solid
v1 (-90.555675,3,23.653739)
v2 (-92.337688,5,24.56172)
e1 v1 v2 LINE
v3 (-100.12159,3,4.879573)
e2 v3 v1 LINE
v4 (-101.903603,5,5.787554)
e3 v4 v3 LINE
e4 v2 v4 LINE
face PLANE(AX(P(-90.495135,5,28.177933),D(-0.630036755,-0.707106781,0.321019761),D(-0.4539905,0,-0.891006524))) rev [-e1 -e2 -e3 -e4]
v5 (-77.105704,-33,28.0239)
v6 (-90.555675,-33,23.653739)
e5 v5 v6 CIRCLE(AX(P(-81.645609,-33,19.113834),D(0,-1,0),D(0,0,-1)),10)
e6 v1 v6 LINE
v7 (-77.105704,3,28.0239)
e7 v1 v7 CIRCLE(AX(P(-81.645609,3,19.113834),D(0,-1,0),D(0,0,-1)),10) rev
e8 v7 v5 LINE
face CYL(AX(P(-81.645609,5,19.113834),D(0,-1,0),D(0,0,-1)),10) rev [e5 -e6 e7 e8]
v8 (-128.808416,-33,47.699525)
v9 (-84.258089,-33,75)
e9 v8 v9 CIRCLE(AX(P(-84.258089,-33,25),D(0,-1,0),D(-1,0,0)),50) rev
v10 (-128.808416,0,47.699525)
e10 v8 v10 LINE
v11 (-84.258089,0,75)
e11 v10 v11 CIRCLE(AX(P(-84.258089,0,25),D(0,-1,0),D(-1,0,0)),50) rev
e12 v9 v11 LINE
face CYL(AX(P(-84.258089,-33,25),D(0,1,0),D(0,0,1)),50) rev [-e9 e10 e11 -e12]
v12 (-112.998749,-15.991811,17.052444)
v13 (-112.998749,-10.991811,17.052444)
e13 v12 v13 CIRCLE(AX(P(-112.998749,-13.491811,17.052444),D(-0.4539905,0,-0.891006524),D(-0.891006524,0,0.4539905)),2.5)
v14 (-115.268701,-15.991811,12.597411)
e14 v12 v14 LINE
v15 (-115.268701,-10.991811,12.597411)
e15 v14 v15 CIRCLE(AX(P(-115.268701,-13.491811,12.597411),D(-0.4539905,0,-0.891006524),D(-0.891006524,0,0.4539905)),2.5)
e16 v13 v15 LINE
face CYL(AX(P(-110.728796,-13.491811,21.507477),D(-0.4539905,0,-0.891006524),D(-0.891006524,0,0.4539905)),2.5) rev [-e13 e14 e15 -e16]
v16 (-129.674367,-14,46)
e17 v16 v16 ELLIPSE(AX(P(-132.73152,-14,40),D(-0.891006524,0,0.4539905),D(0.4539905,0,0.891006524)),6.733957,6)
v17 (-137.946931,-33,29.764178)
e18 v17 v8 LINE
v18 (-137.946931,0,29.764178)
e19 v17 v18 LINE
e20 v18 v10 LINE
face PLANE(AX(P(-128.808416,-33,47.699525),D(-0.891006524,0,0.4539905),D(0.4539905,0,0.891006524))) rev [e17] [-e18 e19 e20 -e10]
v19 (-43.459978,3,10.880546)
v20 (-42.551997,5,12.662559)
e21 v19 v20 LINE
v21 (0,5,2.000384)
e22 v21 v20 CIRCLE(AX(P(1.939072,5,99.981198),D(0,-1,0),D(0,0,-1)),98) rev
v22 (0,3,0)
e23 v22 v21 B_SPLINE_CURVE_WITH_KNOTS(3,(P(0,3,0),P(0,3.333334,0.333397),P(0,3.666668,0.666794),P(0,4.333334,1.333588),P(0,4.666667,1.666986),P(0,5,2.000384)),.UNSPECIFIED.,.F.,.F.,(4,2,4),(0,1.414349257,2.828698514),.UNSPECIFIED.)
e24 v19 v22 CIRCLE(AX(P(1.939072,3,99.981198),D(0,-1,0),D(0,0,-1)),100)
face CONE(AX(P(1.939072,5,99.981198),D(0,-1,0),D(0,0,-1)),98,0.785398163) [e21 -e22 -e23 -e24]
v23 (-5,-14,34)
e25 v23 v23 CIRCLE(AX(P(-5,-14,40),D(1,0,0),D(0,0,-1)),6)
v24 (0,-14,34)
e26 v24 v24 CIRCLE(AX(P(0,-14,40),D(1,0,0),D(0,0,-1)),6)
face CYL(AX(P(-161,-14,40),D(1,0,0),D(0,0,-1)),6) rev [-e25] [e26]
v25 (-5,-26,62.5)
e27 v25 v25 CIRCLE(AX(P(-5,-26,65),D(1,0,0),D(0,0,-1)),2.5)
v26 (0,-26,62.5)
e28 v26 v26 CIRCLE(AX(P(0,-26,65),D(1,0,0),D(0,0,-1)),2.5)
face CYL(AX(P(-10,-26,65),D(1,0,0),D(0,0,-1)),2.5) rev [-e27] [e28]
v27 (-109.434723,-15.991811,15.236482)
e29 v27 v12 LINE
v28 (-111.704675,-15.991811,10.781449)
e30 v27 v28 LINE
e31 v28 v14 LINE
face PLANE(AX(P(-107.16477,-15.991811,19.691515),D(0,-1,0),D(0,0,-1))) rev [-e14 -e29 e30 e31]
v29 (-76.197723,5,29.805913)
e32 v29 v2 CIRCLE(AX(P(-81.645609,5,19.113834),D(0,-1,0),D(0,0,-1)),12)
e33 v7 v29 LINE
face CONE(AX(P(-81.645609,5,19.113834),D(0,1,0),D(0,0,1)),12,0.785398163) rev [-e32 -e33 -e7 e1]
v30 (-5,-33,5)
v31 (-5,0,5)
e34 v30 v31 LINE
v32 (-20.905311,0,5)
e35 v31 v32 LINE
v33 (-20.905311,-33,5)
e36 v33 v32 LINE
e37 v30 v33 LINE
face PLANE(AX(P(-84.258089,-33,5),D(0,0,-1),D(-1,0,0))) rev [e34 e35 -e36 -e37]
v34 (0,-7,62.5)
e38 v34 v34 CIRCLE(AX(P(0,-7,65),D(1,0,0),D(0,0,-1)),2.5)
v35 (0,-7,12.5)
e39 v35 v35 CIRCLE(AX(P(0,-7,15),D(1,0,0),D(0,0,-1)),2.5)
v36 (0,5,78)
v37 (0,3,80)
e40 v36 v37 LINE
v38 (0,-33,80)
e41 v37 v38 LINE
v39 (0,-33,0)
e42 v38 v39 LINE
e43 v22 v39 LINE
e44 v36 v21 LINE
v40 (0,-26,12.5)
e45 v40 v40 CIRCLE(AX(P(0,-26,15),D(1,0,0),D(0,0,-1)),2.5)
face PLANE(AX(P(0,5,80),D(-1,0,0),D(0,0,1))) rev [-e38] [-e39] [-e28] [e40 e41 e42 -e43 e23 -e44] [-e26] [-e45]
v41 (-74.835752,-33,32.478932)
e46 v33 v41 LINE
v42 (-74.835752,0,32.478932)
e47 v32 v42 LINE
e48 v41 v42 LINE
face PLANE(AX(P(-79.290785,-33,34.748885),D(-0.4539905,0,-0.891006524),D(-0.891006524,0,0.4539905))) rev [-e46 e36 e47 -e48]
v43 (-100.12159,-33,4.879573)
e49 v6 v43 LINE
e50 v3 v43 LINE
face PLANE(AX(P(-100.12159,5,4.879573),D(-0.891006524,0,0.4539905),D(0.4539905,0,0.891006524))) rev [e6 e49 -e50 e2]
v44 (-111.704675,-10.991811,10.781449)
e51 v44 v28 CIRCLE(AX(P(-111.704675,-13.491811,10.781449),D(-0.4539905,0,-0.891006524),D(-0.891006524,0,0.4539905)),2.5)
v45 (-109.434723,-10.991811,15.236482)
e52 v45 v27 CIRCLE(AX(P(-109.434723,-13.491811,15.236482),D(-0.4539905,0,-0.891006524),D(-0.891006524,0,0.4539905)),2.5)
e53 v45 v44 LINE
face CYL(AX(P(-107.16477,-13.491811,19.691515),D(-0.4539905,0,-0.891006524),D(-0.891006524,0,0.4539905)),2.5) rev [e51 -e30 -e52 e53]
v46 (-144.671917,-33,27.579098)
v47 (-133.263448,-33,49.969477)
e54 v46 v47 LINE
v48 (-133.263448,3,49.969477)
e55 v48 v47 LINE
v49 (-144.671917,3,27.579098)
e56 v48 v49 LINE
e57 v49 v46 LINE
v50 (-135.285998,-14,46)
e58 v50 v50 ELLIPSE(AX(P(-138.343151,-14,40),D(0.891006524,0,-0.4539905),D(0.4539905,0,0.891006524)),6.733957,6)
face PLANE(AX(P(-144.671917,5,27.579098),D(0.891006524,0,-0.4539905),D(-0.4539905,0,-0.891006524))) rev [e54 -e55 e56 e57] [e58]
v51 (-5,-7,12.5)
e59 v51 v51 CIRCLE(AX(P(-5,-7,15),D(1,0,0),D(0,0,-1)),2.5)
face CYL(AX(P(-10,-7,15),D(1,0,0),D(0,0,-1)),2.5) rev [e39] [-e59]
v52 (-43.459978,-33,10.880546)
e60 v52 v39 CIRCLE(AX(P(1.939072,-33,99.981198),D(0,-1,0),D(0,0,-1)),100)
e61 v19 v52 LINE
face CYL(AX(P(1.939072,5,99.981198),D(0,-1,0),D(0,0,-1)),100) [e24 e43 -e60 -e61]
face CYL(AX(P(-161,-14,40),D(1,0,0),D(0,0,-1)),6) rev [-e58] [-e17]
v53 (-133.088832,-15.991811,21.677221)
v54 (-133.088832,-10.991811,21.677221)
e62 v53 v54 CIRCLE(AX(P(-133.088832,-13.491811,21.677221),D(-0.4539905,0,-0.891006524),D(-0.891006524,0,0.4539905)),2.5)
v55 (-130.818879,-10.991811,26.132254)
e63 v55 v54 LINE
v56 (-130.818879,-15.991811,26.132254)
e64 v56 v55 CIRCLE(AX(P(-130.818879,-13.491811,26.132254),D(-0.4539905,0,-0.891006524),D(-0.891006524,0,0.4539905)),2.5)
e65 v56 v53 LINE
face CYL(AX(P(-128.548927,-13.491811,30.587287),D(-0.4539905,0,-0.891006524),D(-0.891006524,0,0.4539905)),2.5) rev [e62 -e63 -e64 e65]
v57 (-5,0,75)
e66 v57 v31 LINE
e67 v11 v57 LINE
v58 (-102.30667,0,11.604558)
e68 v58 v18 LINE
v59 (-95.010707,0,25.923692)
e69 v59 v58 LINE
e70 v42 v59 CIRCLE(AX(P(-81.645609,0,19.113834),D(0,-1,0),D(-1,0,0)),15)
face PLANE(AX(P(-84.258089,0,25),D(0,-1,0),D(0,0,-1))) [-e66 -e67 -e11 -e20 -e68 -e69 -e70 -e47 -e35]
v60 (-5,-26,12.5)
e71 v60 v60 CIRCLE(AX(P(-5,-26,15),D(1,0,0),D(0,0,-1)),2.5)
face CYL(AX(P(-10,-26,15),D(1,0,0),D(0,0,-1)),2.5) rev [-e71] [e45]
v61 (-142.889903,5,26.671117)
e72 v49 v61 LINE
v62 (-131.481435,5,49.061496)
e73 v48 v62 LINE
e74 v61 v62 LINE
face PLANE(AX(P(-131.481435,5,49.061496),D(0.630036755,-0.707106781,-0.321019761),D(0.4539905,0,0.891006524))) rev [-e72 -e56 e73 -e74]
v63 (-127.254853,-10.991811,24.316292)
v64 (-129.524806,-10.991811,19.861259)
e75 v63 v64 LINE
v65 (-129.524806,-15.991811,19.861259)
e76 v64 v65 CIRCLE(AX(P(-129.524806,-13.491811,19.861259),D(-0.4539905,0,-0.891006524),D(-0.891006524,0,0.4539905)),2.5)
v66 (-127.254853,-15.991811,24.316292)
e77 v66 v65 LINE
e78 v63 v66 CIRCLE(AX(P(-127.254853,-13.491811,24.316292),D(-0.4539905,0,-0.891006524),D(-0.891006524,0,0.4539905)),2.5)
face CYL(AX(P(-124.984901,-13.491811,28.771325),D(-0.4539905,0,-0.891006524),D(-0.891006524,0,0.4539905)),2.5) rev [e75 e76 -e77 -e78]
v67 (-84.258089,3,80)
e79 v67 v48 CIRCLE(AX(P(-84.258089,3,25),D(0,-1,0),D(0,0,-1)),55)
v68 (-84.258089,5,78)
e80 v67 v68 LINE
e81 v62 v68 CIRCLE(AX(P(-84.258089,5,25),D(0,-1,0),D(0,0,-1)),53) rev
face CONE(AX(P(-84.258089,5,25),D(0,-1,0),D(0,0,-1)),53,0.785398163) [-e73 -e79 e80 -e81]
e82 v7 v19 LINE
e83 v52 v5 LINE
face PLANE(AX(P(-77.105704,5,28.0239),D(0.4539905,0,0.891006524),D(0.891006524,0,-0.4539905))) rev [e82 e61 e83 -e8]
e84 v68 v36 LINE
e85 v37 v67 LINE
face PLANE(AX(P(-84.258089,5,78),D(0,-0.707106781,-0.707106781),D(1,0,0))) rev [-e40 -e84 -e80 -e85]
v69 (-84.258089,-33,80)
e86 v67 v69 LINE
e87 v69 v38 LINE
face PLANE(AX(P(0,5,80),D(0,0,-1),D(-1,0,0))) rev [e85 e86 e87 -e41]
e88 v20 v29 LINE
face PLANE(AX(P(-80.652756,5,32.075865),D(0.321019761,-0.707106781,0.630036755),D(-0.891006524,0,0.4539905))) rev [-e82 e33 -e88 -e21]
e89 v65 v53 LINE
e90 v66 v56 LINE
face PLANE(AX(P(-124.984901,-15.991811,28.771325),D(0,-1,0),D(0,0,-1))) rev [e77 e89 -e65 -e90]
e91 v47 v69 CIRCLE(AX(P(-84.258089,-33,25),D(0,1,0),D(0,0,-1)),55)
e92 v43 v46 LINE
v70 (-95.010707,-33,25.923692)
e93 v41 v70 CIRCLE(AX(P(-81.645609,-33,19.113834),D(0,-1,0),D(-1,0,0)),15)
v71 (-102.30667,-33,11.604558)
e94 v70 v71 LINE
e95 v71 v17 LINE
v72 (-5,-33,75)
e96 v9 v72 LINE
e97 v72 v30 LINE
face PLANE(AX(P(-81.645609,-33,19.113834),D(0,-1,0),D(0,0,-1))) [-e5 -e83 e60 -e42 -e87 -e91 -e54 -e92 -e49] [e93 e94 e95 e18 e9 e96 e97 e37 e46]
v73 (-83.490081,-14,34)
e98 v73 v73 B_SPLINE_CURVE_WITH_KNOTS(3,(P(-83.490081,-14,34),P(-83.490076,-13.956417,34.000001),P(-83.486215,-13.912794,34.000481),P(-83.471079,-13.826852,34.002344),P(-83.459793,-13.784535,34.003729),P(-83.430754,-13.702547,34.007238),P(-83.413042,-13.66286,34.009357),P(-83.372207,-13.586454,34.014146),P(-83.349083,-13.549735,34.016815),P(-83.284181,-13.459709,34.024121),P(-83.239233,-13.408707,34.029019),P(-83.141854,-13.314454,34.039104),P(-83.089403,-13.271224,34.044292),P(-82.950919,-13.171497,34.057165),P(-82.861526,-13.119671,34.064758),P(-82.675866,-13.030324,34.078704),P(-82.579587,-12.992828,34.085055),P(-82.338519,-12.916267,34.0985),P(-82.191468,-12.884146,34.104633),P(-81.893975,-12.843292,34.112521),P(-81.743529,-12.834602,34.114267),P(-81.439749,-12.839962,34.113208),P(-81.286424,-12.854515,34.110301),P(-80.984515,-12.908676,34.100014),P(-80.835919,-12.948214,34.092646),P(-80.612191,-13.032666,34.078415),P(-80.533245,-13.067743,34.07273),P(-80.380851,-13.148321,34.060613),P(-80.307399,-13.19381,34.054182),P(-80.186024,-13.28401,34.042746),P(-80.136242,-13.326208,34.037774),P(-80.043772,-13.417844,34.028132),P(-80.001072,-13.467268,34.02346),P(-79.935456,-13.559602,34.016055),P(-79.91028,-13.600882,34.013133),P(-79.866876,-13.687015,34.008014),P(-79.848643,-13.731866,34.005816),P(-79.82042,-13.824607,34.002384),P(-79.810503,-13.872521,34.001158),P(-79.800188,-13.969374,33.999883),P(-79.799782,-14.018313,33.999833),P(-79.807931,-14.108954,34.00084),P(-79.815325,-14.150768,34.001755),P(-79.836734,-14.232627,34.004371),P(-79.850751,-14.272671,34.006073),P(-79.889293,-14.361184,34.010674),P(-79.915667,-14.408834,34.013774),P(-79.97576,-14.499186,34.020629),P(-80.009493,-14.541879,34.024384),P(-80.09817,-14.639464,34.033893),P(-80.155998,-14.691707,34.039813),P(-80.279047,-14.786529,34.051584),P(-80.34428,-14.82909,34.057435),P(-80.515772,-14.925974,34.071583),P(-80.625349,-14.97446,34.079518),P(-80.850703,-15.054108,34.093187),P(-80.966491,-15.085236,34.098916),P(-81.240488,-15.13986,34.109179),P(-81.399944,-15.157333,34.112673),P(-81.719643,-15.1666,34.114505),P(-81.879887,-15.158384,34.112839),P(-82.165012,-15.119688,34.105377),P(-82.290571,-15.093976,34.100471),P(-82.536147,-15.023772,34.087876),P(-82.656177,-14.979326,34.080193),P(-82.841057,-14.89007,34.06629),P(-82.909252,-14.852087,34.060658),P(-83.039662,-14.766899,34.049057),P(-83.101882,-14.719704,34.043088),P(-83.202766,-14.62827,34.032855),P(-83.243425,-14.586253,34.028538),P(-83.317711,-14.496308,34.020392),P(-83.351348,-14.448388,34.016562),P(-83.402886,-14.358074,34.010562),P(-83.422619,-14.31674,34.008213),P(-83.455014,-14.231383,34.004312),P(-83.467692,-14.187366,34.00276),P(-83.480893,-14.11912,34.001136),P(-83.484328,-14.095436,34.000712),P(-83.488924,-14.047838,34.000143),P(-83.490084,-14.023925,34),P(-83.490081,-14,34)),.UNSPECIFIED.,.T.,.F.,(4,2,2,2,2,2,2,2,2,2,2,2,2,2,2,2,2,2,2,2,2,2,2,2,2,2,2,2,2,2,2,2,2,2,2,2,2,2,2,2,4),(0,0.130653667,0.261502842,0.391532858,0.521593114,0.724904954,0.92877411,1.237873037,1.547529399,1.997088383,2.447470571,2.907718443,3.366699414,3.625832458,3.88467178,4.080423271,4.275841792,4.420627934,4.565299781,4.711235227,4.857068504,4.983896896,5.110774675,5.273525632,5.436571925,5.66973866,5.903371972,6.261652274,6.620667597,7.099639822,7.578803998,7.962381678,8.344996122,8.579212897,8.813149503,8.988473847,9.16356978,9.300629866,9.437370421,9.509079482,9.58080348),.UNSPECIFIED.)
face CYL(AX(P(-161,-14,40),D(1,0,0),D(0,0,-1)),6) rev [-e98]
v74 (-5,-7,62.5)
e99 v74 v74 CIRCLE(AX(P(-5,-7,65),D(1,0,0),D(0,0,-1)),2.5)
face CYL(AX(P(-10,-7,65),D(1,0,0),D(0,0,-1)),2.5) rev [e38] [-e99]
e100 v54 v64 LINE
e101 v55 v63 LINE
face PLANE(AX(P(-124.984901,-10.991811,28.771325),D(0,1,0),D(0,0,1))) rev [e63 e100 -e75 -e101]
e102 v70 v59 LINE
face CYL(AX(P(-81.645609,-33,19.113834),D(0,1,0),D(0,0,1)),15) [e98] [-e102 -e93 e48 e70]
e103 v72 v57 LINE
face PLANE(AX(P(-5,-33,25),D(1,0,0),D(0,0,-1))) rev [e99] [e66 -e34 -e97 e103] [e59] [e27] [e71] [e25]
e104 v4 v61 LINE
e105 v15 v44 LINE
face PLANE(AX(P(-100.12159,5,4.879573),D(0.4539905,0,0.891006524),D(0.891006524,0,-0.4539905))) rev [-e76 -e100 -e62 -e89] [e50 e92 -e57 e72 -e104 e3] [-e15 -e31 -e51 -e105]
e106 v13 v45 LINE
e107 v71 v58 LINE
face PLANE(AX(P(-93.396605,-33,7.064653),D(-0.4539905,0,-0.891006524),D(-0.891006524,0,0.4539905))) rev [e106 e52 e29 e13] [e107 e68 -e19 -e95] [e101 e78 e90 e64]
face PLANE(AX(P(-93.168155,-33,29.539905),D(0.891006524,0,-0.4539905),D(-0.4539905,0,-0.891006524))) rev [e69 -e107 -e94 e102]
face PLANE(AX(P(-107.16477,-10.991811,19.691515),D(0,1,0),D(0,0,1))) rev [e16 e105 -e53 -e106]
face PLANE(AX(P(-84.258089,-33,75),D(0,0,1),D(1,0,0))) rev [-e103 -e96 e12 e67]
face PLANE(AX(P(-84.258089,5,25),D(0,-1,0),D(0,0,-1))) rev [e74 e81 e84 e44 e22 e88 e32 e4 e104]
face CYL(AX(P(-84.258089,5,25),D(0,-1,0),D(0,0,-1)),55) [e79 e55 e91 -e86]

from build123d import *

# Parameters (mm, degrees)
ESTRUSIONE_ESTRUSIONE1_DEPTH = 5
ESTRUSIONE_SOTTILE1_START    = -33
ESTRUSIONE_SOTTILE1_DEPTH    = 33
RACCORDO1_R                  = 100
SMUSSO1_SIZE                 = 2
TAGLIO_ESTRUSIONE1_DEPTH     = 10
SCHIZZO3_R                   = 2.5
TAGLIO_ESTRUSIONE2_DEPTH     = 10
SCHIZZO3_4_R                 = 6
TAGLIO_ESTRUSIONE3_DEPTH     = 161


with BuildPart() as part:
    # Schizzo1 → Estrusione-Estrusione1 (new body)
    with BuildSketch(Plane(origin=(0, 0, 0), x_dir=(1, 0, 0), z_dir=(0, 1, 0))):
        with BuildLine():
            Line((0, -80), (0, 0))
            Line((0, 0), (-22.105704403, 0))
            Line((-22.105704403, 0), (-77.105704403, -28.023899722))
            ThreePointArc((-77.105704403, -28.023899722), (-84.735779344, -28.624399643), (-90.555674642, -23.653739478))
            Line((-90.555674642, -23.653739478), (-100.121590311, -4.879572892))
            Line((-100.121590311, -4.879572892), (-144.67191652, -27.579097879))
            Line((-144.67191652, -27.579097879), (-133.263448287, -49.969477486))
            ThreePointArc((-133.263448287, -49.969477486), (-112.995510516, -71.895209039), (-84.258089456, -80))
            Line((-84.258089456, -80), (0, -80))
        make_face()
    extrude(amount=ESTRUSIONE_ESTRUSIONE1_DEPTH)

    # Schizzo1<3> → Estrusione-Sottile1 (add)
    with BuildSketch(Plane(origin=(0, 0, 0), x_dir=(1, 0, 0), z_dir=(0, 1, 0)).offset(ESTRUSIONE_SOTTILE1_START)):
        with BuildLine():
            Line((-90.555674642, -23.653739478), (-100.121590311, -4.879572892))
            Line((-100.121590311, -4.879572892), (-144.67191652, -27.579097879))
            Line((-144.67191652, -27.579097879), (-133.263448287, -49.969477486))
            ThreePointArc((-133.263448287, -49.969477486), (-112.995510516, -71.895209039), (-84.258089456, -80))
            Line((-84.258089456, -80), (0, -80))
            Line((0, -80), (0, 0))
            Line((0, 0), (-22.105704403, 0))
            Line((-22.105704403, 0), (-77.105704403, -28.023899722))
            ThreePointArc((-77.105704403, -28.023899722), (-84.735779344, -28.624399643), (-90.555674642, -23.653739478))
        make_face()
        with BuildLine():
            Line((-95.010707263, -25.923691976), (-102.306670433, -11.604558011))
            Line((-102.306670433, -11.604558011), (-137.946931401, -29.764178001))
            Line((-137.946931401, -29.764178001), (-128.808415666, -47.699524987))
            ThreePointArc((-128.808415666, -47.699524987), (-110.383017692, -67.632008218), (-84.258089456, -75))
            Line((-84.258089456, -75), (-5, -75))
            Line((-5, -75), (-5, -5))
            Line((-5, -5), (-20.905310607, -5))
            Line((-20.905310607, -5), (-74.835751904, -32.478932343))
            ThreePointArc((-74.835751904, -32.478932343), (-86.280864316, -33.379682225), (-95.010707263, -25.923691976))
        make_face(mode=Mode.SUBTRACT)
    extrude(amount=ESTRUSIONE_SOTTILE1_DEPTH)

    # Raccordo1
    # the kernel refuses this fillet: 100 mm, written as the material it takes off along each edge
    with BuildSketch(Plane(origin=(-22.105704403, -92.916153629, 0), x_dir=(-0.8910065241883712, 0, 0.4539904997395403), z_dir=(0, 1, 0))) as raccordo1_piece_1:
        with BuildLine():
            CenterArc((23.966461452, 100), RACCORDO1_R, 244.111076085, 25.888923915)
            Line((-19.696326845, 10.035779789), (-20.569582611, 8.236495385))
            ThreePointArc((-20.569582611, 8.236495385), (-10.756144422, 3.235876846), (-0.907980999, -1.782013048))
            Line((-0.907980999, -1.782013048), (0, -2))
            Line((0, -2), (23.966461452, -2))
            Line((23.966461452, -2), (23.966461452, 0))
        make_face()
    extrude(amount=157.832307258, mode=Mode.SUBTRACT)

    # Smusso1
    smusso1_edges = [part.edges().sort_by_distance(p)[0] for p in [
        (-84.735779344, 5, 28.624399643),
        (-95.338632476, 5, 14.266656185),
        (-138.967682403, 5, 38.774287682),
        (-112.995510516, 5, 71.895209039),
        (-42.129044728, 5, 80),
        (-60.28284116, 5, 19.452222767),
        (-22.347158994, 5, 2.975121197),
    ]]
    chamfer(smusso1_edges, length=SMUSSO1_SIZE)

    # Schizzo2 → Taglio-Estrusione1 (cut)
    with BuildSketch(Plane(origin=(-18.661969348, 0, -36.626177095), x_dir=(-0.8910065241883686, 0, 0.4539904997395456), z_dir=(-0.4539904997395456, 0, -0.8910065241883686))):
        with BuildLine():
            Line((104.424269915, -10.991811), (108.424269915, -10.991811))
            ThreePointArc((108.424269915, -10.991811), (110.924269915, -13.491811), (108.424269915, -15.991811))
            Line((108.424269915, -15.991811), (104.424269915, -15.991811))
            ThreePointArc((104.424269915, -15.991811), (101.924269915, -13.491811), (104.424269915, -10.991811))
        make_face()
        with BuildLine():
            Line((124.424269915, -10.991811), (128.424269915, -10.991811))
            ThreePointArc((128.424269915, -10.991811), (130.924269915, -13.491811), (128.424269915, -15.991811))
            Line((128.424269915, -15.991811), (124.424269915, -15.991811))
            ThreePointArc((124.424269915, -15.991811), (121.924269915, -13.491811), (124.424269915, -10.991811))
        make_face()
    extrude(amount=-TAGLIO_ESTRUSIONE1_DEPTH, mode=Mode.SUBTRACT)

    # Schizzo3 → Taglio-Estrusione2 (cut)
    with BuildSketch(Plane(origin=(0, 0, 0), x_dir=(0, 0, -1), z_dir=(1, 0, 0))):
        with Locations((-65, -26)):
            Circle(SCHIZZO3_R)
        with Locations((-65, -7)):
            Circle(SCHIZZO3_R)
        with Locations((-15, -7)):
            Circle(SCHIZZO3_R)
        with Locations((-15, -26)):
            Circle(SCHIZZO3_R)
    extrude(amount=-TAGLIO_ESTRUSIONE2_DEPTH, mode=Mode.SUBTRACT)

    # Schizzo3<4> → Taglio-Estrusione3 (cut)
    with BuildSketch(Plane(origin=(0, 0, 0), x_dir=(0, 0, -1), z_dir=(1, 0, 0))):
        with Locations((-40, -14)):
            Circle(SCHIZZO3_4_R)
    extrude(amount=-TAGLIO_ESTRUSIONE3_DEPTH, mode=Mode.SUBTRACT)


solid = part.part
